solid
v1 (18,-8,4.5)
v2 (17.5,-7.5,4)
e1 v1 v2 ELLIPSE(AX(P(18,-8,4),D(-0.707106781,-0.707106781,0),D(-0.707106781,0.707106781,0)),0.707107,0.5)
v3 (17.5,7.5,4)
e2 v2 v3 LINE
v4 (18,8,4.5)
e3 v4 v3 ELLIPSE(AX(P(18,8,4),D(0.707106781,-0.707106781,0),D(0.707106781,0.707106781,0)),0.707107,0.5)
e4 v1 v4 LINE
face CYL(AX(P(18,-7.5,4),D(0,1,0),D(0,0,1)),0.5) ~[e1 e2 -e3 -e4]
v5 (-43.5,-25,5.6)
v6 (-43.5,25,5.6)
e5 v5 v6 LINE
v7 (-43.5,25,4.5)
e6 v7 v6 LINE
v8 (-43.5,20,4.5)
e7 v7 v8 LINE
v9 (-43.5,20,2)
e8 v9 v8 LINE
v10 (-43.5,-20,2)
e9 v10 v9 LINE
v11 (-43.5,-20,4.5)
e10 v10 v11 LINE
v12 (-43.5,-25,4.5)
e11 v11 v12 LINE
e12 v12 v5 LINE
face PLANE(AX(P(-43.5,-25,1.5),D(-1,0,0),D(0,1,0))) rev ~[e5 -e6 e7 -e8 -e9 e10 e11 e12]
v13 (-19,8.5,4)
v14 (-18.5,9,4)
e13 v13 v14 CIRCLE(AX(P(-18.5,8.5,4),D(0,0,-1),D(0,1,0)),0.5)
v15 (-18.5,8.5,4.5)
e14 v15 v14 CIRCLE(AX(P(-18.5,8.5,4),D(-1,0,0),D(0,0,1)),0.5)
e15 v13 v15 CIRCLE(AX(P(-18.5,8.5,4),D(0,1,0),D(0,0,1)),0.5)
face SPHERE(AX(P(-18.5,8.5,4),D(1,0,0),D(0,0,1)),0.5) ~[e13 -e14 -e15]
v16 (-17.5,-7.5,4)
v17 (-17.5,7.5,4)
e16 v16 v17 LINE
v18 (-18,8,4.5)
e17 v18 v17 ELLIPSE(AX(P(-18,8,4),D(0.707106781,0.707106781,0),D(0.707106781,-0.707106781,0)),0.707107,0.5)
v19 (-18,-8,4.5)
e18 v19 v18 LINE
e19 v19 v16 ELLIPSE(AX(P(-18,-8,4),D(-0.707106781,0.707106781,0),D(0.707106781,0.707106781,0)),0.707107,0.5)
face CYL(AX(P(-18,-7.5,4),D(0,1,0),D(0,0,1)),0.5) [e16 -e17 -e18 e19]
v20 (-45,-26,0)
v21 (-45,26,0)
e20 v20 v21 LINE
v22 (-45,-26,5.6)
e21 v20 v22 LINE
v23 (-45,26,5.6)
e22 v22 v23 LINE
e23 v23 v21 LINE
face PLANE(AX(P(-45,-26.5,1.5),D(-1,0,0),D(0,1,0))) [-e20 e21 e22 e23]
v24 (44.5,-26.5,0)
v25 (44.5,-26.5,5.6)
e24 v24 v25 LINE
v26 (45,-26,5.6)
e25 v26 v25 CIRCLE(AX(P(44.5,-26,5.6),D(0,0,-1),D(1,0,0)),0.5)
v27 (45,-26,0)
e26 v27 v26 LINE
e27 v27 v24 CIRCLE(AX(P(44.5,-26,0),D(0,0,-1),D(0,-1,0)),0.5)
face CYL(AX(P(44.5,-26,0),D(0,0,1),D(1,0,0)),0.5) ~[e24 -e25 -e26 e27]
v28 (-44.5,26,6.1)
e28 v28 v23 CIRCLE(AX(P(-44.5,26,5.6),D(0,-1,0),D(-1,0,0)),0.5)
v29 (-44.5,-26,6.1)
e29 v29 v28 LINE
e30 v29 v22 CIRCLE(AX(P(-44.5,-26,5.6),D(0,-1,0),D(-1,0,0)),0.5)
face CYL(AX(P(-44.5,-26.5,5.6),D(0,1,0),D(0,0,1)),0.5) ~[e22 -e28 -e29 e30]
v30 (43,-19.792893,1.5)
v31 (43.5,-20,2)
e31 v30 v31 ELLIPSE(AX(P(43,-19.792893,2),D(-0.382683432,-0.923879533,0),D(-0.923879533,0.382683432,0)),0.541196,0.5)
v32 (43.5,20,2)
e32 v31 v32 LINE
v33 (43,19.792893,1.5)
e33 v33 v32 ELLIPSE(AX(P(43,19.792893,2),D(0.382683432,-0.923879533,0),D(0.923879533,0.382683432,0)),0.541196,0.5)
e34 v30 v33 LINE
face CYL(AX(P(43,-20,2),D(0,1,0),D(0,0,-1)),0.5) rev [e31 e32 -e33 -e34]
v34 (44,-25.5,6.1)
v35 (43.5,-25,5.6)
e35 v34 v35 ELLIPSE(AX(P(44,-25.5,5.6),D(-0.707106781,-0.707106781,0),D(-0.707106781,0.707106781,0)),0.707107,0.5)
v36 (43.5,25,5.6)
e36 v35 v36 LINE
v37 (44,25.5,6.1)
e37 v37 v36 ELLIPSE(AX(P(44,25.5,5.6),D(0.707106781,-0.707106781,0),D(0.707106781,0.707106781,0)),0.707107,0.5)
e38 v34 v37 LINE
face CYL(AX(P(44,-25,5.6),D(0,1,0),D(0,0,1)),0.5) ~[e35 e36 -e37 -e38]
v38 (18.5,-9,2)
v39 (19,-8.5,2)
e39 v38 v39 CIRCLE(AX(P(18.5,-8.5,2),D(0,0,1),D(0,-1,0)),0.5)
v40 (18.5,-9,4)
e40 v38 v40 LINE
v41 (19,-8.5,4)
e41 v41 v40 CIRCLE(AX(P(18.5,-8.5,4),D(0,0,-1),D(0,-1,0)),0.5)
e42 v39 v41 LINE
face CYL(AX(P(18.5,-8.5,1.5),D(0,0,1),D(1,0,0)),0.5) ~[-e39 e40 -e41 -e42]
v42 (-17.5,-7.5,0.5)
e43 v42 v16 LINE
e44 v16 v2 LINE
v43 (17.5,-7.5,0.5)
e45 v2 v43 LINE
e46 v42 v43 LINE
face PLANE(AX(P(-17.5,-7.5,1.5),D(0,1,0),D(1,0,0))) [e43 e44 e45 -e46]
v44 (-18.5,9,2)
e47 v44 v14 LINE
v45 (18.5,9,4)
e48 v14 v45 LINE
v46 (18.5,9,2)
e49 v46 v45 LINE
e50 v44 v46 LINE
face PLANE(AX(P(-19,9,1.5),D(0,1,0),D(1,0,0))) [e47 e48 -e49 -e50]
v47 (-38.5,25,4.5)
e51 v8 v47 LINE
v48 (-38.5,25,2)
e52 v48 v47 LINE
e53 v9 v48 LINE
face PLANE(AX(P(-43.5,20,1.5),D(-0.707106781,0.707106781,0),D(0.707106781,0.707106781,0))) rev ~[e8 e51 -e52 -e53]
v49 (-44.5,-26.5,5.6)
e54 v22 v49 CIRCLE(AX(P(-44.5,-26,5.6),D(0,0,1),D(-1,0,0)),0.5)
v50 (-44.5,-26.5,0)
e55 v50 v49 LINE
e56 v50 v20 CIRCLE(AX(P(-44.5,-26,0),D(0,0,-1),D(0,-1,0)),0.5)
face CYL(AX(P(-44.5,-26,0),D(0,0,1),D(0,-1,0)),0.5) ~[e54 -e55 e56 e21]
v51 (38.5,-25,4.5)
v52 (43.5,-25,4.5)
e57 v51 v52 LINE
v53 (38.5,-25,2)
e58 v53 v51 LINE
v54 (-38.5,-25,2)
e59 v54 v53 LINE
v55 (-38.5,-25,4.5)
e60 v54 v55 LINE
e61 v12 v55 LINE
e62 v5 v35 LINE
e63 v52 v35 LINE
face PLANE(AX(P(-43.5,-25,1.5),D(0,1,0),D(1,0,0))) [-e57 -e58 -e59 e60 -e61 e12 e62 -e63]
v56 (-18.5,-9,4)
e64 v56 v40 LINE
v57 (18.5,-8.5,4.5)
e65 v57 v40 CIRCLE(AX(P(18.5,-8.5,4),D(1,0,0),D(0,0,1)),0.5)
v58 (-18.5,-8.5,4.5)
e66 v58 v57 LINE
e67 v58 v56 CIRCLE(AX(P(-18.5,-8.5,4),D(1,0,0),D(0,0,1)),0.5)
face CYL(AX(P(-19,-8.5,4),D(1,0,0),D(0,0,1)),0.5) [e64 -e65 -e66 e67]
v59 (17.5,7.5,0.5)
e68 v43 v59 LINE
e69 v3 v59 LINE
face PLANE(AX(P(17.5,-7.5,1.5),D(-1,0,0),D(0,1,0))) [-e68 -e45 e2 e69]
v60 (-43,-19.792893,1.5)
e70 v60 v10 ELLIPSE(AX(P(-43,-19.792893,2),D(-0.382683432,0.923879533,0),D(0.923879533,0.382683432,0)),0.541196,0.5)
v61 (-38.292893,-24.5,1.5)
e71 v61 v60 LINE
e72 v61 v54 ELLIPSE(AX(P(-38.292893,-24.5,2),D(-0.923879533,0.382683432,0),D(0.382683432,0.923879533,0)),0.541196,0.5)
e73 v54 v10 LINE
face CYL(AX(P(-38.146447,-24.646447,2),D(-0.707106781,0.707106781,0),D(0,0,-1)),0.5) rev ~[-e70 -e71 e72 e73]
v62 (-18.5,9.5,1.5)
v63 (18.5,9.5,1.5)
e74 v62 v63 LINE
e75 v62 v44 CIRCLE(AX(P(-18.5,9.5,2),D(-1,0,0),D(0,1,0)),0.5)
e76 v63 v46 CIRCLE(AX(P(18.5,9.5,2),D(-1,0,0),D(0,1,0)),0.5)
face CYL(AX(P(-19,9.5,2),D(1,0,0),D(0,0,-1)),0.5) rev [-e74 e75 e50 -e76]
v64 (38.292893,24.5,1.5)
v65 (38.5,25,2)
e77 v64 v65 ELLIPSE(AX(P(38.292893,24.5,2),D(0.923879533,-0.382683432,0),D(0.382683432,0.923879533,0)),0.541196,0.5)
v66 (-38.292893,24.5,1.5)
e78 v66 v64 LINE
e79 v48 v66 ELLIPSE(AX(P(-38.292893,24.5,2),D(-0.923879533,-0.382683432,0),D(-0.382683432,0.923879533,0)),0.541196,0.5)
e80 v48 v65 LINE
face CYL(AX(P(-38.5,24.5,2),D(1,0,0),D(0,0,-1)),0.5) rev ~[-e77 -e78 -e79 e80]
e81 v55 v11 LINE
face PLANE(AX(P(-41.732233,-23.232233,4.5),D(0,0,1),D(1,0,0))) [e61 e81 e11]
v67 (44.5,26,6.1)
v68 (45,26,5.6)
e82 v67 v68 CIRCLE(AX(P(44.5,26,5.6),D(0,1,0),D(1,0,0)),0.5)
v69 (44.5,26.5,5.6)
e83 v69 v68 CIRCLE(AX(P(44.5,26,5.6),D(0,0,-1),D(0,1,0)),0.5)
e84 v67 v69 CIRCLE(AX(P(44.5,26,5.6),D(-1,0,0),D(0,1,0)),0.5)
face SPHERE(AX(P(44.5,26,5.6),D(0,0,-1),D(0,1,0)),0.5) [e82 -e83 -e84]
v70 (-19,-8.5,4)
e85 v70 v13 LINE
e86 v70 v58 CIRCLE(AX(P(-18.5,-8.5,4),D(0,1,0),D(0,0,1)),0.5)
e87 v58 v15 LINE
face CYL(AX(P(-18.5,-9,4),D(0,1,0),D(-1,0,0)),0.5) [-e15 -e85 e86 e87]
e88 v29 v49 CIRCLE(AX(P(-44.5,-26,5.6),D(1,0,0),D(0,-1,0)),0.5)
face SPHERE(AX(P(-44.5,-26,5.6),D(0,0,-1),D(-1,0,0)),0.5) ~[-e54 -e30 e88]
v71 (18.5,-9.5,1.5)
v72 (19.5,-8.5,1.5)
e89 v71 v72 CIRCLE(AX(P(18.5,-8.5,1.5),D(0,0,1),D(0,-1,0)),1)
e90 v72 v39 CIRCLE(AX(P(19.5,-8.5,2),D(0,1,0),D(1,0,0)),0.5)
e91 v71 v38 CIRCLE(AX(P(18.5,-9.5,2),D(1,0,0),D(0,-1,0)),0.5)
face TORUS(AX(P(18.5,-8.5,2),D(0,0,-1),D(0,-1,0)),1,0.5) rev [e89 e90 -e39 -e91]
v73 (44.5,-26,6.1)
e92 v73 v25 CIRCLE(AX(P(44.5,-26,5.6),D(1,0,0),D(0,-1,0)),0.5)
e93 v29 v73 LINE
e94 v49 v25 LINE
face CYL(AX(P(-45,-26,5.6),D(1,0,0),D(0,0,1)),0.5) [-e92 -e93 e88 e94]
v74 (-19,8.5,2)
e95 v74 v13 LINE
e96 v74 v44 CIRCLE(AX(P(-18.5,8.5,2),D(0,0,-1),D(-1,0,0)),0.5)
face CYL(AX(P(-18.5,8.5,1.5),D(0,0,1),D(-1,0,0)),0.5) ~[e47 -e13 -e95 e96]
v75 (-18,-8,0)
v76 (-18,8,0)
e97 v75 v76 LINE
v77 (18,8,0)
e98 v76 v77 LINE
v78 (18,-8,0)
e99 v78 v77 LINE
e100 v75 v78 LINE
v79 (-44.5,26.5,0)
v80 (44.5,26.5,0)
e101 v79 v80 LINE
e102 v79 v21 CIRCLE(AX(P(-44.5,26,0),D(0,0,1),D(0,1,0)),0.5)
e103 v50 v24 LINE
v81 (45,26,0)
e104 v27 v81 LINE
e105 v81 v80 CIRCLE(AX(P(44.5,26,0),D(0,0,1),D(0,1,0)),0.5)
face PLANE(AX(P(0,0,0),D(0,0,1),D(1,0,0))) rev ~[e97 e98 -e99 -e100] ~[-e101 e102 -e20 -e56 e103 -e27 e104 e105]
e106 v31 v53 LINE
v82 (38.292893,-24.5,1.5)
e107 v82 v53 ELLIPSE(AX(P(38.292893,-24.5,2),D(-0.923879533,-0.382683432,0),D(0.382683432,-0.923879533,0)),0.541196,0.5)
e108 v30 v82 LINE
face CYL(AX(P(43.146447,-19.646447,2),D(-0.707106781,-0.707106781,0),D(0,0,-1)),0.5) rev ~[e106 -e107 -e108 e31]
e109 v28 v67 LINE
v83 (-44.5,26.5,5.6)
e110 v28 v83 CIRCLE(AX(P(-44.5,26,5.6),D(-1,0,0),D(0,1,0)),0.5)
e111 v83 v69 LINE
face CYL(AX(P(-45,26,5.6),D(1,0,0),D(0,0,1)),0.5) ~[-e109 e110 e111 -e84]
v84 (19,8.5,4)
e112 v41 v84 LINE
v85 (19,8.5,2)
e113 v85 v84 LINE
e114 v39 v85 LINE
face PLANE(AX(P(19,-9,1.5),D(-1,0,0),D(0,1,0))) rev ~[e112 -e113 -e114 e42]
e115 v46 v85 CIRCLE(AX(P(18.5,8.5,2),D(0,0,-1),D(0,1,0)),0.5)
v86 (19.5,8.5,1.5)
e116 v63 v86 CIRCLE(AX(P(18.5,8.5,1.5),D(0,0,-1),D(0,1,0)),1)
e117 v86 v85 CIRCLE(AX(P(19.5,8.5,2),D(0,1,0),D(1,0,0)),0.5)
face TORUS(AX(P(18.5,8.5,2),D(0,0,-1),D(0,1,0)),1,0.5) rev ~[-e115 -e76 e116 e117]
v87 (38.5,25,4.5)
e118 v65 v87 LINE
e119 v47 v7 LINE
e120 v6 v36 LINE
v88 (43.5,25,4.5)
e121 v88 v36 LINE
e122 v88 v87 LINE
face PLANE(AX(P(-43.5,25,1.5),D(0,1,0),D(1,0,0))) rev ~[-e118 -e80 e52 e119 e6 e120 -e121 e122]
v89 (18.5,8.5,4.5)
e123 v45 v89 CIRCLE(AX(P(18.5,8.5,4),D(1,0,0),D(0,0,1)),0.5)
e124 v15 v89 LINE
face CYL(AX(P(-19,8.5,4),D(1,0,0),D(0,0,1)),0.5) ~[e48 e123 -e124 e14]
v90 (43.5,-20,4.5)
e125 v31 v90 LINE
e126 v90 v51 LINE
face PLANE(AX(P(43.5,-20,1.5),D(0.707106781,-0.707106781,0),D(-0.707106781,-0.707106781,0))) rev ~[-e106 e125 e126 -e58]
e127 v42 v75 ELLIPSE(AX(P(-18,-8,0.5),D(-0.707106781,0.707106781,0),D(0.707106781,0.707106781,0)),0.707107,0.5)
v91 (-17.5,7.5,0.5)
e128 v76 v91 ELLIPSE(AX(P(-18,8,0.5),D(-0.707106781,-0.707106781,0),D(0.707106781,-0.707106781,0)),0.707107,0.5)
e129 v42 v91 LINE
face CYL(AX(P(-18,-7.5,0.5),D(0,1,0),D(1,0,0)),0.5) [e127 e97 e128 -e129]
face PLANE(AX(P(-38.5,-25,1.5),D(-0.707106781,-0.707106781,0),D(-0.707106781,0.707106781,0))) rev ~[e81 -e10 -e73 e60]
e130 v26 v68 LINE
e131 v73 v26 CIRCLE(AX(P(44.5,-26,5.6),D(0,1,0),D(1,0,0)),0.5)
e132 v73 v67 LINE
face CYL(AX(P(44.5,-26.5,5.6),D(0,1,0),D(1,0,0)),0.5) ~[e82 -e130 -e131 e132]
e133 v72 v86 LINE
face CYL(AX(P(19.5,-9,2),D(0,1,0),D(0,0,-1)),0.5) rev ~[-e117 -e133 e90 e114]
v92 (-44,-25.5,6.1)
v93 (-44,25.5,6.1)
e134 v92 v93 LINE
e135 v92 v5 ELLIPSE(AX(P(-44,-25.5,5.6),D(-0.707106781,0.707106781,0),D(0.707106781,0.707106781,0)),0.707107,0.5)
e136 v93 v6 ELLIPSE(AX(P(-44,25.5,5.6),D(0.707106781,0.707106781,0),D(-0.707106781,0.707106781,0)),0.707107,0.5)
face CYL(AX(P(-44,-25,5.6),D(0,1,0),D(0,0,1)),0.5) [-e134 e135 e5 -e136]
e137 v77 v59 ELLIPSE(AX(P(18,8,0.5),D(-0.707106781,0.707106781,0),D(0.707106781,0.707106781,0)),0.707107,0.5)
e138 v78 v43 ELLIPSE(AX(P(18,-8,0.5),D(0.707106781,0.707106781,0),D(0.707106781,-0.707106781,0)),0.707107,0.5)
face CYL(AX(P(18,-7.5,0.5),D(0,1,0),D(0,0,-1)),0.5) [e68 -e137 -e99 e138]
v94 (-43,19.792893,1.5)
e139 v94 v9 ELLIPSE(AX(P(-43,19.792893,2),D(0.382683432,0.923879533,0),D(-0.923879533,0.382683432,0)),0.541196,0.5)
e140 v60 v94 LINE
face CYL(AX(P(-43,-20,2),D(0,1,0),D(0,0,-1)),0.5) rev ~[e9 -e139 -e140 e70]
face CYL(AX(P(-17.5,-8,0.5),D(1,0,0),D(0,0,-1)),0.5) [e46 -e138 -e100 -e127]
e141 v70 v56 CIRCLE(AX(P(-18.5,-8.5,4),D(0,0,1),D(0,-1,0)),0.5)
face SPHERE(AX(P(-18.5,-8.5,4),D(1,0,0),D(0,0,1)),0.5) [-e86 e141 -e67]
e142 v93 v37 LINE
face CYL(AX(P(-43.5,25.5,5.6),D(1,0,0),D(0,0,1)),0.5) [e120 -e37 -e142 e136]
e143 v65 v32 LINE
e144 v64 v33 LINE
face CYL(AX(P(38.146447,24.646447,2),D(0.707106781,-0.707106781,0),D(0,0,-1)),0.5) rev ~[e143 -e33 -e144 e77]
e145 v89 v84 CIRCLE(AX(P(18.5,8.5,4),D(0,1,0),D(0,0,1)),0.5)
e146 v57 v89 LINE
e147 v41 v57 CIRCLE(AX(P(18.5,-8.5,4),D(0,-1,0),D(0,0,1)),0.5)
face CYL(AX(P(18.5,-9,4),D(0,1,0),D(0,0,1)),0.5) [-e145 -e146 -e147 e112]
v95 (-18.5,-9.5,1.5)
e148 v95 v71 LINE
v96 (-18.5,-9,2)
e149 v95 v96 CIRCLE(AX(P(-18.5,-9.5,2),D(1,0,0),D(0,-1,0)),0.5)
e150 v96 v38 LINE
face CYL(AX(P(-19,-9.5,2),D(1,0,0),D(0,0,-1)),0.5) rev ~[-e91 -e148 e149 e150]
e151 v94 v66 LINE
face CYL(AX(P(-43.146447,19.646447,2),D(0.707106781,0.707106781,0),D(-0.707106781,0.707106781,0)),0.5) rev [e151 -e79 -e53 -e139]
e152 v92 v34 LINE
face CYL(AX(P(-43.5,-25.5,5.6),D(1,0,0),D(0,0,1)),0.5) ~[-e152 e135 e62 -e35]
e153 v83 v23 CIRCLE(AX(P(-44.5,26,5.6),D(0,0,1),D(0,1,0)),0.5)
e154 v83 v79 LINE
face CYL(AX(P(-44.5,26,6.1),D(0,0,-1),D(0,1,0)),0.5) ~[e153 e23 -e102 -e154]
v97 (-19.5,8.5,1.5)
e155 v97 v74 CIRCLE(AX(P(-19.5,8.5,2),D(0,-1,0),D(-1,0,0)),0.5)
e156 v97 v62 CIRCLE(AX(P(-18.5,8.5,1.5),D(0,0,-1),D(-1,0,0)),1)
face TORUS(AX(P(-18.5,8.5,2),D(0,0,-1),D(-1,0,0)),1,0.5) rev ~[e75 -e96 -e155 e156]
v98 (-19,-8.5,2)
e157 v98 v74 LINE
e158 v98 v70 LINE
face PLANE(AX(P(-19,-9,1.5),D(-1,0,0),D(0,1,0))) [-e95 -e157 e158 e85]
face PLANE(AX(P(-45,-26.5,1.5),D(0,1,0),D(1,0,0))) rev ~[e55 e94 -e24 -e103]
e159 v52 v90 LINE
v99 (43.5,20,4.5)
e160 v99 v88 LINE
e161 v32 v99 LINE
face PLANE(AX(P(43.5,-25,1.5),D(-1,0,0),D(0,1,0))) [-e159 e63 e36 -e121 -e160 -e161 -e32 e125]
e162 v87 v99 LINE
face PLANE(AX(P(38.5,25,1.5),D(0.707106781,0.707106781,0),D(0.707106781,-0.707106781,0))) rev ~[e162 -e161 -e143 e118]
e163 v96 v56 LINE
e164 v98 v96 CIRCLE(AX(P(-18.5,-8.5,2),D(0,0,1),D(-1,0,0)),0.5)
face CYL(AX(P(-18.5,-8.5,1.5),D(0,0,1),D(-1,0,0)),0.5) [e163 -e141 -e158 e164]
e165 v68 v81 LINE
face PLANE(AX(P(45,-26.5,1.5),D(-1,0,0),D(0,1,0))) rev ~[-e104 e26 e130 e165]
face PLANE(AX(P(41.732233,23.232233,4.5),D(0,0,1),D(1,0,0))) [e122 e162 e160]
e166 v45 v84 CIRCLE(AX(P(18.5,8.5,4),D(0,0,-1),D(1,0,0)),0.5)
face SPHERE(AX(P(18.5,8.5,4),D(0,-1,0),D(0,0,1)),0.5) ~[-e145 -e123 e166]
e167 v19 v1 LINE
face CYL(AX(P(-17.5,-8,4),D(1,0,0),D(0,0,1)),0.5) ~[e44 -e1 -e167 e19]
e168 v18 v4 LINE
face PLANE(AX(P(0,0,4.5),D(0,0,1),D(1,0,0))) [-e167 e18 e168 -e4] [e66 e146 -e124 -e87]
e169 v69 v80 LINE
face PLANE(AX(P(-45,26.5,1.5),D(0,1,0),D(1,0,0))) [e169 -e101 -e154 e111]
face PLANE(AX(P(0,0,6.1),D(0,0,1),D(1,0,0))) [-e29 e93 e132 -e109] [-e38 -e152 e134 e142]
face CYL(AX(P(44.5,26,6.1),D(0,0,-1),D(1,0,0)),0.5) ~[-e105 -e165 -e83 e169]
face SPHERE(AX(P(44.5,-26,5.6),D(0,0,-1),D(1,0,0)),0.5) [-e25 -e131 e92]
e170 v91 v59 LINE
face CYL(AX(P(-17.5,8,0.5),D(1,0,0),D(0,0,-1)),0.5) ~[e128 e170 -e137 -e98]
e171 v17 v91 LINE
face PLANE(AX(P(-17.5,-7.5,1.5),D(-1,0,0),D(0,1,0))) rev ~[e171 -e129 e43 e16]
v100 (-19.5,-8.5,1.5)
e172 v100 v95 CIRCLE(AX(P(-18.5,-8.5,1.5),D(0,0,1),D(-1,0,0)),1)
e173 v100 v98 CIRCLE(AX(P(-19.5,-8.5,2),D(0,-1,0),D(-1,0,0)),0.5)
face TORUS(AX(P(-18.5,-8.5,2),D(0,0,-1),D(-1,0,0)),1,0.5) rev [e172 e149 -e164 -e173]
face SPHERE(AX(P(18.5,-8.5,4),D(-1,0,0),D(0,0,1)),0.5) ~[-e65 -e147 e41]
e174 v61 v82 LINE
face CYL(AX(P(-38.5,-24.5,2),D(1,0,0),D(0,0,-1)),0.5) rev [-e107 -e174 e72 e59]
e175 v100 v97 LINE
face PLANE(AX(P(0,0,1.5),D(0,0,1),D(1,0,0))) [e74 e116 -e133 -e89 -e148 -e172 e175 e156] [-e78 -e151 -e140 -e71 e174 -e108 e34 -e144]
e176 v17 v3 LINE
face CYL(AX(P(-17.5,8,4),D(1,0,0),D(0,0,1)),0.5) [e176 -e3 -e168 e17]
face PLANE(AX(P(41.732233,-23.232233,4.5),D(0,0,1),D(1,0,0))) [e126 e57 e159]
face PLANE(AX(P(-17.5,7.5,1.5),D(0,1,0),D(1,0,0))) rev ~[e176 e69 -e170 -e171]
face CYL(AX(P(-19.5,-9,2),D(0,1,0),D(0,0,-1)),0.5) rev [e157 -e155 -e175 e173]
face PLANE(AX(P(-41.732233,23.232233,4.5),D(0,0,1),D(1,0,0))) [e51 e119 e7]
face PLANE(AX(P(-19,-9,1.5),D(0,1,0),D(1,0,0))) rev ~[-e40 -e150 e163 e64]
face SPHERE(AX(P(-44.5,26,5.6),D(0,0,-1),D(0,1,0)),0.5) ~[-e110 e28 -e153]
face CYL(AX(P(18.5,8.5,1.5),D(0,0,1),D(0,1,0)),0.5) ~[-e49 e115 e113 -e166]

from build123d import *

# Parameters (mm, degrees)
F1_W     = 90
F1_H     = 53
F1_W_2   = 35
F1_H_2   = 15
F2_DEPTH = 1.5
F3_W     = 90
F3_H     = 53
F3_W_2   = 87
F3_H_2   = 50
F4_DEPTH = 4.6
F5_W     = 38
F5_H     = 18
F5_W_2   = 35
F5_H_2   = 15
F6_DEPTH = 3
F7_R     = 0.5


with BuildPart() as f2:
    # F1 (on Top) → F2 (new body)
    with BuildSketch(Plane.XY):
        Rectangle(F1_W, F1_H)
        Rectangle(F1_W_2, F1_H_2, mode=Mode.SUBTRACT)
    extrude(amount=F2_DEPTH)

    # F3 (on face) → F4 (join)
    with BuildSketch(Plane.XY.offset(1.5)):
        Rectangle(F3_W, F3_H)
        Rectangle(F3_W_2, F3_H_2, mode=Mode.SUBTRACT)
    extrude(amount=F4_DEPTH)

    # F5 (on face) → F6 (join)
    with BuildSketch(Plane.XY.offset(1.5)):
        Polygon((-38.5, 25), (-43.5, 25), (-43.5, 20), align=None)
        Polygon((43.5, 20), (43.5, 25), (38.5, 25), align=None)
        Polygon((-43.5, -20), (-43.5, -25), (-38.5, -25), align=None)
        Polygon((38.5, -25), (43.5, -25), (43.5, -20), align=None)
        Rectangle(F5_W, F5_H)
        Rectangle(F5_W_2, F5_H_2, mode=Mode.SUBTRACT)
    extrude(amount=F6_DEPTH)

    # F7
    f7_edges = [f2.edges().sort_by_distance(p)[0] for p in [
        (-45, -26.5, 3.05),
        (45, -26.5, 3.05),
        (45, 26.5, 3.05),
        (-45, 26.5, 3.05),
        (0, 26.5, 6.1),
        (-45, 0, 6.1),
        (45, 0, 6.1),
        (0, -26.5, 6.1),
        (-43.5, 0, 6.1),
        (0, 25, 6.1),
        (43.5, 0, 6.1),
        (0, -25, 6.1),
        (0, -9, 4.5),
        (19, 0, 4.5),
        (0, 7.5, 4.5),
        (0, 9, 4.5),
        (17.5, 0, 4.5),
        (-17.5, 0, 4.5),
        (-19, 0, 4.5),
        (0, 7.5, 0),
        (-17.5, 0, 0),
        (0, -7.5, 0),
        (17.5, 0, 0),
        (-19, -9, 3),
        (-19, 9, 3),
        (-19, 0, 1.5),
        (0, -7.5, 4.5),
        (19, 0, 1.5),
        (19, 9, 3),
        (19, -9, 3),
        (-43.5, 0, 1.5),
        (-41, -22.5, 1.5),
        (-41, 22.5, 1.5),
        (0, 25, 1.5),
        (41, 22.5, 1.5),
        (43.5, 0, 1.5),
        (41, -22.5, 1.5),
        (0, -25, 1.5),
        (0, 9, 1.5),
        (0, -9, 1.5),
    ]]
    fillet(f7_edges, radius=F7_R)


solid = f2.part
